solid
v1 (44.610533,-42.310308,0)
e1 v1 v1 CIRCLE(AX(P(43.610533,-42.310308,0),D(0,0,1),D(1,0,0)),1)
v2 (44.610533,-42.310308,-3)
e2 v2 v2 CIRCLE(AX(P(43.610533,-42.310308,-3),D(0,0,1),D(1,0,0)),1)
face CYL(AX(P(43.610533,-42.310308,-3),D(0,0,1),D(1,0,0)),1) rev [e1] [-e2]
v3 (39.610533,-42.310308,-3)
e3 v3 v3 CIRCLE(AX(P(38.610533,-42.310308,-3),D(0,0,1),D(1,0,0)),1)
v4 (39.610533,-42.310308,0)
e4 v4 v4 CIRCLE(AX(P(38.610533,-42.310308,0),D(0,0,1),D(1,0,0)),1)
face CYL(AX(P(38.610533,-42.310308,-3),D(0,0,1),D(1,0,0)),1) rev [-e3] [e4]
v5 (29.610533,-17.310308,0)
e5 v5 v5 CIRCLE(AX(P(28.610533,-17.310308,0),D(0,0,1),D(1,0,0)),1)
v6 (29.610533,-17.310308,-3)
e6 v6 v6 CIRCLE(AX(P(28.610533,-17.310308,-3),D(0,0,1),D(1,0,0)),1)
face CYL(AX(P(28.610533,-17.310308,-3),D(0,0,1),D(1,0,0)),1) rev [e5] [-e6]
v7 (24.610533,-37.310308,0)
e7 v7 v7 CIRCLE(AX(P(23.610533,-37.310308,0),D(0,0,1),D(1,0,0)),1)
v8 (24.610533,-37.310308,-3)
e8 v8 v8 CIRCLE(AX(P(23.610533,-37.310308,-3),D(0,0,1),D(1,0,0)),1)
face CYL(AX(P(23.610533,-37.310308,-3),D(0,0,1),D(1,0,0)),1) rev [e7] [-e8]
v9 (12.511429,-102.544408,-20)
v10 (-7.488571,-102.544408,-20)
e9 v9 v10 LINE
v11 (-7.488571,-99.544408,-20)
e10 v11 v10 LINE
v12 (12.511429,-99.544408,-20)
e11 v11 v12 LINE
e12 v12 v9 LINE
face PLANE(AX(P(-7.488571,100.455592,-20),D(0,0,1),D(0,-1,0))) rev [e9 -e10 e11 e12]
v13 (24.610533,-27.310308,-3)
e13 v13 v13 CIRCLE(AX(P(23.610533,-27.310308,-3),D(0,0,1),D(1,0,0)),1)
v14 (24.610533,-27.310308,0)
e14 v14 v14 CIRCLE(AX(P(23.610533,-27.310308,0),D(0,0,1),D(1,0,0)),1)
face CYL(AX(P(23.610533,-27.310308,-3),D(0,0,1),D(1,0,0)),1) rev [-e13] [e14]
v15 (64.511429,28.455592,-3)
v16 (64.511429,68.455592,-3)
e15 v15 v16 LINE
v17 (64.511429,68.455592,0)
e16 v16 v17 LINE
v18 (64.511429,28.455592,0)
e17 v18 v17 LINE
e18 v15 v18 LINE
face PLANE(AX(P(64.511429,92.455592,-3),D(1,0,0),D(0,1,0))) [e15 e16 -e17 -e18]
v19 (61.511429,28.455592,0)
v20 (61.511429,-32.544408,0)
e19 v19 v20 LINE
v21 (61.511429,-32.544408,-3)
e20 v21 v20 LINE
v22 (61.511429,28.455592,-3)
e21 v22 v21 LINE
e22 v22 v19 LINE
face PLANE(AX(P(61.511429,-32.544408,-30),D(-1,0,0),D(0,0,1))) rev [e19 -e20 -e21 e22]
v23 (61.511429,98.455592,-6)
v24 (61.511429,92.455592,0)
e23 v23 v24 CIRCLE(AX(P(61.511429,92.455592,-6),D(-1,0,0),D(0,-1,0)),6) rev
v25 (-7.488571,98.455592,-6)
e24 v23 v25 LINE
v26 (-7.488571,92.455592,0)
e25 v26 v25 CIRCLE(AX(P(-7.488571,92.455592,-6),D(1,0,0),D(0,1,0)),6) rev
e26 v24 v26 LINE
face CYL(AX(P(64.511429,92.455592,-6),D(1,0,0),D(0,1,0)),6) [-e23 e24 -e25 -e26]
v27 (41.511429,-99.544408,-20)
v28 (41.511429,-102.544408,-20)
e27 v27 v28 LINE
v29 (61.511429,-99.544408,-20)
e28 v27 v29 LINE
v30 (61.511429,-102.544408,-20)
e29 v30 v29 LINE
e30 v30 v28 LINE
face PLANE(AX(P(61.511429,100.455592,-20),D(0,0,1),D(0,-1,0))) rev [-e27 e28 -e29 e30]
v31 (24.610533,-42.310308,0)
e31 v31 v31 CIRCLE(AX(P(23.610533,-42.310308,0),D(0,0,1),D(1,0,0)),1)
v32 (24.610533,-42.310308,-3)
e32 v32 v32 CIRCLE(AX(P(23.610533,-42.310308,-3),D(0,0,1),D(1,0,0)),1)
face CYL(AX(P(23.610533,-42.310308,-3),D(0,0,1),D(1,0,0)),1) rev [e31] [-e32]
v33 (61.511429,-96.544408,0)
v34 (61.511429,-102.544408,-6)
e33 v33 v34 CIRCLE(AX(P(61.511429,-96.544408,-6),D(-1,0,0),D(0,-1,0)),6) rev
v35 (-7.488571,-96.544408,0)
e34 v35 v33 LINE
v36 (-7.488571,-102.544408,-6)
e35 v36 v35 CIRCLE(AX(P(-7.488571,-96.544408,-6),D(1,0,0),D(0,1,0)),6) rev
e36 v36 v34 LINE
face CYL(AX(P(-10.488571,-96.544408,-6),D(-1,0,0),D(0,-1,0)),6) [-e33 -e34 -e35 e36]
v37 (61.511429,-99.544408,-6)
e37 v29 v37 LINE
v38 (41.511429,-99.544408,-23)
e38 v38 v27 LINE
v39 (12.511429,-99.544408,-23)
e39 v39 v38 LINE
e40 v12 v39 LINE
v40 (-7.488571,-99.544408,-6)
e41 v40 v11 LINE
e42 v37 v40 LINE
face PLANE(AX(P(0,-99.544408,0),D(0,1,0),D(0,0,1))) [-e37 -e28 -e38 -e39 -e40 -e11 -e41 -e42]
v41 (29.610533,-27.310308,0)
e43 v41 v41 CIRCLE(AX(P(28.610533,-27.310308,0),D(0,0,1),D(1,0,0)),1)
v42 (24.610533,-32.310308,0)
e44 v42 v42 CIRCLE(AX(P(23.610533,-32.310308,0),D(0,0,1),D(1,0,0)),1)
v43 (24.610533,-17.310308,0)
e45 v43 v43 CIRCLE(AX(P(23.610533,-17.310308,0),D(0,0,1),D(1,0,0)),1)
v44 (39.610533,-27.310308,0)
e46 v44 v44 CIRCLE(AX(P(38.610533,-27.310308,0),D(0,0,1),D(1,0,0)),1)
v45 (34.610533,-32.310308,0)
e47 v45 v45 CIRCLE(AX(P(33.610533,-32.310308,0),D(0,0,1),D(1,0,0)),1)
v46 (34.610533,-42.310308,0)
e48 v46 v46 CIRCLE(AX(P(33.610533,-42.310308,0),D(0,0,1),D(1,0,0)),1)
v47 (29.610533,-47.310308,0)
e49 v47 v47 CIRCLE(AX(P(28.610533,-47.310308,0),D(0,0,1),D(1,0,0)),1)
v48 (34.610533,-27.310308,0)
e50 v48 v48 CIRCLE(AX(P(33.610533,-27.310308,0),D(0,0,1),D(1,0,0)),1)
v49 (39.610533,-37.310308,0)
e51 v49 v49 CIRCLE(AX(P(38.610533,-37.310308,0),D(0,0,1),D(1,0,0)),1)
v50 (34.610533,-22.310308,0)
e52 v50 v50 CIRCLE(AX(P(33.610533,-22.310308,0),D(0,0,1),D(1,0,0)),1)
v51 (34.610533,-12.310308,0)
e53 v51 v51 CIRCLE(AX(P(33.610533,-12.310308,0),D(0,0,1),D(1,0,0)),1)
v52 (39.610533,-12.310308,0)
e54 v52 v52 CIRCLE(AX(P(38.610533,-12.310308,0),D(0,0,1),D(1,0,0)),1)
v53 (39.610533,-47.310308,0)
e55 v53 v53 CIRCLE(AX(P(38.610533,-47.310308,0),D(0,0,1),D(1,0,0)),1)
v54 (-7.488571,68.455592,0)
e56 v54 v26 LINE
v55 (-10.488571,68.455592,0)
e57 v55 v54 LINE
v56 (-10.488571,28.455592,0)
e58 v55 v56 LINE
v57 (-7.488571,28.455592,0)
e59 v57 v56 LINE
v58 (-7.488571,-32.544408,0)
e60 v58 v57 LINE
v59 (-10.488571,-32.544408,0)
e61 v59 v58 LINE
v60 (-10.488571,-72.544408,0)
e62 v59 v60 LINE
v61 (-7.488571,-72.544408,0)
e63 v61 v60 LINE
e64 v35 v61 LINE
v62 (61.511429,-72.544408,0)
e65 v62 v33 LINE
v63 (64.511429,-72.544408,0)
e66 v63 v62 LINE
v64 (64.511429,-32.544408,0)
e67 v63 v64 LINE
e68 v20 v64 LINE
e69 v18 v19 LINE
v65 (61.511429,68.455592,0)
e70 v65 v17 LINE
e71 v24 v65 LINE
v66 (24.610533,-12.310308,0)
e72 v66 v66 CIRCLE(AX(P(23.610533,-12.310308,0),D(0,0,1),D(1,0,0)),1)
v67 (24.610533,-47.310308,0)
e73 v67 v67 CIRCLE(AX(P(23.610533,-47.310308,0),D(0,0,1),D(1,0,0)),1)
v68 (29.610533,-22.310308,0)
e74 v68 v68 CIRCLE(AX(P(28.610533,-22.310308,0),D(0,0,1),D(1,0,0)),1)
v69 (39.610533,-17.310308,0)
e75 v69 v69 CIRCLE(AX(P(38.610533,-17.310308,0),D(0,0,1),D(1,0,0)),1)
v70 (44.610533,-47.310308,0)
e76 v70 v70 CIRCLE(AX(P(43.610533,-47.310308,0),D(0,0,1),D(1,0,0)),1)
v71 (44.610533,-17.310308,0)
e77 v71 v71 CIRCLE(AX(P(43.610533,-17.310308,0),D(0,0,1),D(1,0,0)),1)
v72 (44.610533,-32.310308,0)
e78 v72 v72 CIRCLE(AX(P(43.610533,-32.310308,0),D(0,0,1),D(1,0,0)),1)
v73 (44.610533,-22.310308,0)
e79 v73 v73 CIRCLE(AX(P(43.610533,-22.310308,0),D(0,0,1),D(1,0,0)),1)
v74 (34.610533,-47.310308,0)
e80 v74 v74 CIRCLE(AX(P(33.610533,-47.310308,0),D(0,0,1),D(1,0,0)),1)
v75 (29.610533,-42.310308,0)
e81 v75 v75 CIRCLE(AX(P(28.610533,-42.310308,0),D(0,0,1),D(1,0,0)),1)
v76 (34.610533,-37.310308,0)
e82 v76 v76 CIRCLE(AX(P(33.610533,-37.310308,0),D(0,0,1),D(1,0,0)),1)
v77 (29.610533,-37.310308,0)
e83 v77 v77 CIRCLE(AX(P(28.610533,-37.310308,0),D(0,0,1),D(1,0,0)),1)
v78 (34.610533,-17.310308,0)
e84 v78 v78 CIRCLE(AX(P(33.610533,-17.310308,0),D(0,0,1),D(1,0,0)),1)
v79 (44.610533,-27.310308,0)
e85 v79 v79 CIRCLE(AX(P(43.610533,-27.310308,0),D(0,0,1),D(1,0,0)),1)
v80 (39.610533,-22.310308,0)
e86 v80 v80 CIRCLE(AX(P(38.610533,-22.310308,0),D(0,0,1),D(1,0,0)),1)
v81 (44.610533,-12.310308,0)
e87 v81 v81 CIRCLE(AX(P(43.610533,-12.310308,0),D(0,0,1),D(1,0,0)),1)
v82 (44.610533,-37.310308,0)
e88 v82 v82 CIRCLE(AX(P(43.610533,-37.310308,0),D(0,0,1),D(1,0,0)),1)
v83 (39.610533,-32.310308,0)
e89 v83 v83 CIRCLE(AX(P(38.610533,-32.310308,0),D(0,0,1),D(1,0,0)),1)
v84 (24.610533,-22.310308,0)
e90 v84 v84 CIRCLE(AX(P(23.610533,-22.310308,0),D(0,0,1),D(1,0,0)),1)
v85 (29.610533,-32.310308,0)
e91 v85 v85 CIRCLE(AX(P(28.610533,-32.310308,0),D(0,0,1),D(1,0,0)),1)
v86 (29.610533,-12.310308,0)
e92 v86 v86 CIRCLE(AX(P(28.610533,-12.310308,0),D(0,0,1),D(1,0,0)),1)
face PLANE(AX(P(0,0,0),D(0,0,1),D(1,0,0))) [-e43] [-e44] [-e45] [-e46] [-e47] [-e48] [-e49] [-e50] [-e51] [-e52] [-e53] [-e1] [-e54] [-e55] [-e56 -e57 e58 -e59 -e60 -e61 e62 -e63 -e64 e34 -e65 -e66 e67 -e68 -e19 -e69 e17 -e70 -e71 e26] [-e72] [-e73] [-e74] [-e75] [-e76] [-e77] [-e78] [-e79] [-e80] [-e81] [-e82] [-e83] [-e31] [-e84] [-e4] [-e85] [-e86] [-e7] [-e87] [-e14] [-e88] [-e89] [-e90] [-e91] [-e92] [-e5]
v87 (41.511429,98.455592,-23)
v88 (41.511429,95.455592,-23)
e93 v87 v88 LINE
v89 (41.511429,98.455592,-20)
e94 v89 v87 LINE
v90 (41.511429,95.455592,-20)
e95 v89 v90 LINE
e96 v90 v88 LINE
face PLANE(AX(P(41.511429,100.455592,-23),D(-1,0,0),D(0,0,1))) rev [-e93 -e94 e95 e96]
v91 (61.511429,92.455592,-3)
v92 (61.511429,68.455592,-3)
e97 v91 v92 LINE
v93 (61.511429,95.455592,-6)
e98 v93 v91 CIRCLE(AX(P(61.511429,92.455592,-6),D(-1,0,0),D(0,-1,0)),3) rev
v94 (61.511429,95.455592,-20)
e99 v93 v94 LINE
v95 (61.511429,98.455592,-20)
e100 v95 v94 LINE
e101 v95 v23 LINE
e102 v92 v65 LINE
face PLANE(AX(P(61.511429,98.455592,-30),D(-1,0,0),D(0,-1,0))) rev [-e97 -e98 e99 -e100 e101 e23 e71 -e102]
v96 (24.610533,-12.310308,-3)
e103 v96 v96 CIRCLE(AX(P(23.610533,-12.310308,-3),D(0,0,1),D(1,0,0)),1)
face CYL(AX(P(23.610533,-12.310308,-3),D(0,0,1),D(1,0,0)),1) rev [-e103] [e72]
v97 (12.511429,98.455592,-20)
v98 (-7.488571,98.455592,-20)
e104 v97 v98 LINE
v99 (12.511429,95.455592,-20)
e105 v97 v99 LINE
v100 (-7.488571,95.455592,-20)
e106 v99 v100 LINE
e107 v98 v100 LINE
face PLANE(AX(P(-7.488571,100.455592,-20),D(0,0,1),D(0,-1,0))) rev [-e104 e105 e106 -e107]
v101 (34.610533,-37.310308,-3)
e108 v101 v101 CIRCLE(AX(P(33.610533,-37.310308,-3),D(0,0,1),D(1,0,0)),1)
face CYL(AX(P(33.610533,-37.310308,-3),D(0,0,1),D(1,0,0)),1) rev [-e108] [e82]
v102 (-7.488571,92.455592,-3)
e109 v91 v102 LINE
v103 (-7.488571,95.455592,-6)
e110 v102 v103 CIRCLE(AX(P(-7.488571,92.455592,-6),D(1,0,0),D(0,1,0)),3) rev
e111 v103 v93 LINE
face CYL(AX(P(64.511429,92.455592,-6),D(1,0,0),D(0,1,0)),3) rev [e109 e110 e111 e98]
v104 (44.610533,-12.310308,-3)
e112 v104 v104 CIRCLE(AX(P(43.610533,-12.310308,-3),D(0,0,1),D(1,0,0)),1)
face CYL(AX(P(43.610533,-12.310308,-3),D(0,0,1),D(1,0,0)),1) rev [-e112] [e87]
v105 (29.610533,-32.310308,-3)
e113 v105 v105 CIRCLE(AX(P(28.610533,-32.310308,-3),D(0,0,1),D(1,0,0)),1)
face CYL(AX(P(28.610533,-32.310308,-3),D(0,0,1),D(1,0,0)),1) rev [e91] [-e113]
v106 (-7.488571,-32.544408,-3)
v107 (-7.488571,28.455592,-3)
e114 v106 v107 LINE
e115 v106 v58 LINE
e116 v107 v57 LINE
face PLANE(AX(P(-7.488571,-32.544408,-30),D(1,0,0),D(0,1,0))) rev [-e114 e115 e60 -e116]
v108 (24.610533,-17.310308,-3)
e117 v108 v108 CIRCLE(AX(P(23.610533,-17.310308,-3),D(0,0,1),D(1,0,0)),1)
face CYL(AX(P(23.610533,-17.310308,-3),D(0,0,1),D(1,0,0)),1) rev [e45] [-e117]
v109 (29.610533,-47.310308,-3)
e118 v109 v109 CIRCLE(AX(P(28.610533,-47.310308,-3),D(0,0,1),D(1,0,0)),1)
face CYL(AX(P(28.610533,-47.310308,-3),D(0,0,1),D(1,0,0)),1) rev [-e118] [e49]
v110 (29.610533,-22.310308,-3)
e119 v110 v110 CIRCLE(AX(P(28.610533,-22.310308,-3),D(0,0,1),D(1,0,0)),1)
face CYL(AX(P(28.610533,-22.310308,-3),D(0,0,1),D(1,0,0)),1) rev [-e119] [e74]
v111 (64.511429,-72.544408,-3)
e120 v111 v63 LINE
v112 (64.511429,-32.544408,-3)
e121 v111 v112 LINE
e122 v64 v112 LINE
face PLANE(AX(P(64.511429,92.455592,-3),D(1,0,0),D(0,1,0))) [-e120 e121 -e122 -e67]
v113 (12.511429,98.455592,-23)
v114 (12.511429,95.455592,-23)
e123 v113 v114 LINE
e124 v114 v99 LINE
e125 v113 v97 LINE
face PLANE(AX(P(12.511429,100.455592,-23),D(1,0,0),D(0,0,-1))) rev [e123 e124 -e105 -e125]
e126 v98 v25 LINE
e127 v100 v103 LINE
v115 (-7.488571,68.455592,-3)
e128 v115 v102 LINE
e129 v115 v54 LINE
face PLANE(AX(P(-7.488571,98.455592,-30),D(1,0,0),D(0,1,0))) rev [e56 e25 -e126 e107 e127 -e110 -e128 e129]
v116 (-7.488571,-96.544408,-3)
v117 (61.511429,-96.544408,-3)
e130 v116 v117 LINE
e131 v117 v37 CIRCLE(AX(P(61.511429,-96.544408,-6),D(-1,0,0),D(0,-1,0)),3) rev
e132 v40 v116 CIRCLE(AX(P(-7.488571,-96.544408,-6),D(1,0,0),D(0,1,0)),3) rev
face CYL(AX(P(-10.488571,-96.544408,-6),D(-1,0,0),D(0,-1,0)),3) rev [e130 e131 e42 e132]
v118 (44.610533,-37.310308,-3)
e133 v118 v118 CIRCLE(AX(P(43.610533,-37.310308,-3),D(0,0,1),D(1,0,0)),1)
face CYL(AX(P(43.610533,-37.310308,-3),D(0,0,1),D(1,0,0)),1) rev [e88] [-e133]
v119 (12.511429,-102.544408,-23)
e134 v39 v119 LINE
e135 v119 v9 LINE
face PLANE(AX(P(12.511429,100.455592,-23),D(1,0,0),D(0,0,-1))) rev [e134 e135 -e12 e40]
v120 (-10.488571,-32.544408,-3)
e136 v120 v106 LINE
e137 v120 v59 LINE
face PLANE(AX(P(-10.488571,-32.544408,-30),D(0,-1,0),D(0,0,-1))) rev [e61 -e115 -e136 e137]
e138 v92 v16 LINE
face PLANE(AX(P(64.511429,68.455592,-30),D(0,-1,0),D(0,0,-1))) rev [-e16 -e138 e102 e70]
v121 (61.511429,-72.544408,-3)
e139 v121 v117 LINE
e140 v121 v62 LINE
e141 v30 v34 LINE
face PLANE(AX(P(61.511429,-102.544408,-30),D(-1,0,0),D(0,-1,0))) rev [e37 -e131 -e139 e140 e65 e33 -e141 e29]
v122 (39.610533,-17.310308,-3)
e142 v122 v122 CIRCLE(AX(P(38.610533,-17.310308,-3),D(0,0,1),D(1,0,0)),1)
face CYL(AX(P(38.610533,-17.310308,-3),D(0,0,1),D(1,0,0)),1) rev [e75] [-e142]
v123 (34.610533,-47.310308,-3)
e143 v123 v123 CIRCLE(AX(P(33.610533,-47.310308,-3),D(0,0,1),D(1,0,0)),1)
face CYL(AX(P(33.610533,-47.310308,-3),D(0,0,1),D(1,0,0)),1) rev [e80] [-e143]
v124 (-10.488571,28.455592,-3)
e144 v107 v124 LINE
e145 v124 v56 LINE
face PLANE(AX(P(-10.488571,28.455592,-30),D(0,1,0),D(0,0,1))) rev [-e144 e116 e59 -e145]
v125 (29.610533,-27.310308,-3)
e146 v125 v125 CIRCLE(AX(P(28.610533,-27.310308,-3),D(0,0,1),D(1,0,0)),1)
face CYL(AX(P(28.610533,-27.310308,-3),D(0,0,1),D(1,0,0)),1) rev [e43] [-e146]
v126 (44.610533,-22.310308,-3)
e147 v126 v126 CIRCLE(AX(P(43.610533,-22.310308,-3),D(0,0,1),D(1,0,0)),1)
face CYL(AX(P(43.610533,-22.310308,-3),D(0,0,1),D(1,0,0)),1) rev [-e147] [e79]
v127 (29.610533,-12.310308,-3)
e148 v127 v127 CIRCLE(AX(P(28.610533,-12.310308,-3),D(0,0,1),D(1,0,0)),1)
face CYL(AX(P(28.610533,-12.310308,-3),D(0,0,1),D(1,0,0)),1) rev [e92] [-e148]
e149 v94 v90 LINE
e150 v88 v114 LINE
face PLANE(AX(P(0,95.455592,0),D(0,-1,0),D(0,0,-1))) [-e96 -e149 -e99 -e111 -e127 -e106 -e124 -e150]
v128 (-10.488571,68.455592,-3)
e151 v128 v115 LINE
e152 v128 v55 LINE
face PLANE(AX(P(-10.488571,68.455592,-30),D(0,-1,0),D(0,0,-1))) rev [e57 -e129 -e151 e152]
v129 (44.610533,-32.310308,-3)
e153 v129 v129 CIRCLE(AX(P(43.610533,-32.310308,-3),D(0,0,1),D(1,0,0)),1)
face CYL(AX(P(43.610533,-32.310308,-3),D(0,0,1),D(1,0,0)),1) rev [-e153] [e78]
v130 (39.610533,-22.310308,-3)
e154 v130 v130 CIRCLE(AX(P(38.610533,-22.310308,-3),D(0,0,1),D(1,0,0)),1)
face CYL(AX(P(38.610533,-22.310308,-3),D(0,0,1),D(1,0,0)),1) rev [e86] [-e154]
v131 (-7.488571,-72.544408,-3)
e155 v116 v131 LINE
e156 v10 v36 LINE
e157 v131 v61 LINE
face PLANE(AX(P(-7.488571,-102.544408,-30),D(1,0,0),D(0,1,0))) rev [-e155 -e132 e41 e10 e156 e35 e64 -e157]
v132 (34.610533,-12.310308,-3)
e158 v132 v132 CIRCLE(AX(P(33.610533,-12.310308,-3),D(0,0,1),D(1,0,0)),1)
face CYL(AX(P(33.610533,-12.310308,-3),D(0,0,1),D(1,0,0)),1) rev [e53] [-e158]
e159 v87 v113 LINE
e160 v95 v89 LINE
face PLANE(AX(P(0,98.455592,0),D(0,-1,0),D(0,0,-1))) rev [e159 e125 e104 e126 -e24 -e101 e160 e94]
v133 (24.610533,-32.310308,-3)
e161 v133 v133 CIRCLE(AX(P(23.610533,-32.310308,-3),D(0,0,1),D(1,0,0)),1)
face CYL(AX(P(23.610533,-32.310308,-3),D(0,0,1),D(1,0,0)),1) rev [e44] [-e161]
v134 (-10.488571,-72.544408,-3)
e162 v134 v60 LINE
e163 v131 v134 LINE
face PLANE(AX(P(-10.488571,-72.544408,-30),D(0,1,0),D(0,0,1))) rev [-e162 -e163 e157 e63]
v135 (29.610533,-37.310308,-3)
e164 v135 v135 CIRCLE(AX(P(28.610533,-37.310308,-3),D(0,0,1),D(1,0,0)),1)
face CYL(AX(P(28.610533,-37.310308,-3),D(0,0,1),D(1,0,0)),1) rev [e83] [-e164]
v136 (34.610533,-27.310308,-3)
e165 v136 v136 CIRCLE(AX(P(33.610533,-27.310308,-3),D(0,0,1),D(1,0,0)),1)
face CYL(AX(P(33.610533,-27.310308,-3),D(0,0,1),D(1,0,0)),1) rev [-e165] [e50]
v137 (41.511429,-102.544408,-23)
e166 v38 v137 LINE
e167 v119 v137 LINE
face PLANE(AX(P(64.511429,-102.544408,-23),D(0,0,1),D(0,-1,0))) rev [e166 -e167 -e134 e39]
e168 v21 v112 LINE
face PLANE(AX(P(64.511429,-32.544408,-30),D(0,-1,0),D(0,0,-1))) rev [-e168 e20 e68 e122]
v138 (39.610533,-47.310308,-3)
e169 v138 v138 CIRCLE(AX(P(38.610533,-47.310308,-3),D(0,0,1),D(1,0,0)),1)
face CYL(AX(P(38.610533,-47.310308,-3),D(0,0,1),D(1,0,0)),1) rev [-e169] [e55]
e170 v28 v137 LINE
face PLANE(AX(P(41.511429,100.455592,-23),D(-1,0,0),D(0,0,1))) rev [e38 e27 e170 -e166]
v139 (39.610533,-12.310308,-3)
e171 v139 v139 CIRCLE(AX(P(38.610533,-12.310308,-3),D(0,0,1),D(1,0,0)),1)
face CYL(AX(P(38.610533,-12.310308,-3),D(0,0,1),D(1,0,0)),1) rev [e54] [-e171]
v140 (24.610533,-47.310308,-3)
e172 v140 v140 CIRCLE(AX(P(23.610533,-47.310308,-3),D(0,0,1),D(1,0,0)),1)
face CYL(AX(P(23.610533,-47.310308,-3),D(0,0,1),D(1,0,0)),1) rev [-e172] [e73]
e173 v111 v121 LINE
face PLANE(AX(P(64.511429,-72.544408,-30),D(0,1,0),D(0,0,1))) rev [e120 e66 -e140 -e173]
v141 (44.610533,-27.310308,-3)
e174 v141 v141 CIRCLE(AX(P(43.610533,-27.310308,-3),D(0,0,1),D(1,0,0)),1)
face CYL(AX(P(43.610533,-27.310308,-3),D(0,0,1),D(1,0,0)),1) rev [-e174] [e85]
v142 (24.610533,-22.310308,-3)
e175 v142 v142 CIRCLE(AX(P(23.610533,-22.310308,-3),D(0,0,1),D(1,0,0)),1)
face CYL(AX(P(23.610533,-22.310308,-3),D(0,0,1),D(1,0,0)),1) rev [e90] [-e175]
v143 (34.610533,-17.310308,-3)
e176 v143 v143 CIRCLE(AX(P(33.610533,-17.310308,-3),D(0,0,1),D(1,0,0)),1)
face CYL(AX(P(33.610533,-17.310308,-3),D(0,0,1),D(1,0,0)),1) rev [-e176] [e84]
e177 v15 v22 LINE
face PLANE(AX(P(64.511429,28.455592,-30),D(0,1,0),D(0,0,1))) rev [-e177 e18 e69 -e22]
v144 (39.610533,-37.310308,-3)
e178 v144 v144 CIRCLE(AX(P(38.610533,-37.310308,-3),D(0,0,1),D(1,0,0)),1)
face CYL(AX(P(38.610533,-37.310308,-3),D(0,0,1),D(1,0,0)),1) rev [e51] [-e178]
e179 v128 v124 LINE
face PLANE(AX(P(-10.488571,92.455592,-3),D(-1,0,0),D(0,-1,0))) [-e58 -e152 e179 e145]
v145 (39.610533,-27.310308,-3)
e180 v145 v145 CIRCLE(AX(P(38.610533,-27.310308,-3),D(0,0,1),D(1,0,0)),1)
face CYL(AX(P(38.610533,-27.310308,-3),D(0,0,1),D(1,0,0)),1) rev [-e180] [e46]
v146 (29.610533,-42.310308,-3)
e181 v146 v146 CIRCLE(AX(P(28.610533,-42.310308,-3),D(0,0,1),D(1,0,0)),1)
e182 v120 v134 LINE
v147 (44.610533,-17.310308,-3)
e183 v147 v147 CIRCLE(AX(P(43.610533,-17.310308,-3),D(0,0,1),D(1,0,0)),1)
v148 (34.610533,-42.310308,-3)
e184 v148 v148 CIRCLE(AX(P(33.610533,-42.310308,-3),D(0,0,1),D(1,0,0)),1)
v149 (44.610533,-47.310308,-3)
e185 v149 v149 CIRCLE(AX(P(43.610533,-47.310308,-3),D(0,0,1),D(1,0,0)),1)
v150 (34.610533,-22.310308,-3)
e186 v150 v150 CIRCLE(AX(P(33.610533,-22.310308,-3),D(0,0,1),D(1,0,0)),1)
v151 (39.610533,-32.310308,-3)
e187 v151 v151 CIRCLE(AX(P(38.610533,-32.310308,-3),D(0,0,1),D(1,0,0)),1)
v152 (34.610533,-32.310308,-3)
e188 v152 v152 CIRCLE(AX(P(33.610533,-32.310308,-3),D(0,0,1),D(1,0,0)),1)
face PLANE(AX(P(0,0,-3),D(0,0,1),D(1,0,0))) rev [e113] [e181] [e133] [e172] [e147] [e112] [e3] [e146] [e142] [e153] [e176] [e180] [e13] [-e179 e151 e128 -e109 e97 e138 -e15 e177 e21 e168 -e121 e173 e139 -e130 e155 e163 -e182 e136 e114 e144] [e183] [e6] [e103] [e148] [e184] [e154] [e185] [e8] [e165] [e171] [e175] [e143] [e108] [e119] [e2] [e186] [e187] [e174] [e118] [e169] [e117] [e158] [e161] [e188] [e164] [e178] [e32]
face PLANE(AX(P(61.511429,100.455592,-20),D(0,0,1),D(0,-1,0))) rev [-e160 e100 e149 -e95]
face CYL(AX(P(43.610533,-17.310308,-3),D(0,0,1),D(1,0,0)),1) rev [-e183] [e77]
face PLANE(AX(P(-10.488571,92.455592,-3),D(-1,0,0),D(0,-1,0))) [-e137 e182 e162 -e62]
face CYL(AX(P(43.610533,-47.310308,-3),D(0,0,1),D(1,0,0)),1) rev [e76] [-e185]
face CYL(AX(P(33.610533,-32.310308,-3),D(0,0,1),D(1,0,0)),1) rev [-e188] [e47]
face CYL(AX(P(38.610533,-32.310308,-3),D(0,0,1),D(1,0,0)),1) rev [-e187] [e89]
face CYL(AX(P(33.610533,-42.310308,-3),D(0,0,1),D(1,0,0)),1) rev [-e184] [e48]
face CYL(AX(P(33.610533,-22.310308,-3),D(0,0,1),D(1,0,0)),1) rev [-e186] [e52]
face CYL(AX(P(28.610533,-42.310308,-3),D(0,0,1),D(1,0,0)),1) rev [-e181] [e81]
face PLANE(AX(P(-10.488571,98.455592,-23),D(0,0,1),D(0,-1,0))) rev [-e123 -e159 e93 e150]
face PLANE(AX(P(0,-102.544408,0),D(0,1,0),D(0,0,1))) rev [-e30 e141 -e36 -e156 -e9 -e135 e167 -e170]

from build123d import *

# Parameters (mm, degrees)
SKETCH_1_W                       = 75
SKETCH_1_H                       = 192
SM_BASE_FLANGE_2_DEPTH           = 3
SM_EDGE_FLANGE_1_STRIP_W         = 18
SM_EDGE_FLANGE_1_STRIP_H         = 3
SM_EDGE_FLANGE_1_STRIP_CUT_DEPTH = 75
SM_EDGE_FLANGE_1_DEPTH           = 75
SM_EDGE_FLANGE_2_DEPTH           = 75
SKETCH_18_W                      = 3
SKETCH_18_H                      = 30
SKETCH_18_H_2                    = 61
CUT_EXTRUDE_1_DEPTH              = 30
SKETCH_19_W                      = 20
SKETCH_19_H                      = 3
CUT_EXTRUDE_2_DEPTH              = 203
SKETCH_20_R                      = 1
CUT_EXTRUDE_3_DEPTH              = 3


# Sheet-metal steps are written as plain solids
with BuildPart() as part:
    # 草图1 → 基体-法兰2 (new body)
    with BuildSketch(Plane.XY):
        with Locations((27.011429417, -3.544407938)):
            Rectangle(SKETCH_1_W, SKETCH_1_H)
    extrude(amount=-SM_BASE_FLANGE_2_DEPTH)

    # 边线-法兰1 strip (across the edge) → 边线-法兰1 strip cut (cut)
    with BuildSketch(Plane(origin=(64.511429417, -99.544407938, -3), x_dir=(0, 1, 0), z_dir=(-1, 0, 0))):
        with Locations((-6, -1.5)):
            Rectangle(SM_EDGE_FLANGE_1_STRIP_W, SM_EDGE_FLANGE_1_STRIP_H)
    extrude(amount=SM_EDGE_FLANGE_1_STRIP_CUT_DEPTH, mode=Mode.SUBTRACT)

    # 边线-法兰1 section (across the edge) → 边线-法兰1 (add)
    with BuildSketch(Plane(origin=(64.511429417, -99.544407938, -3), x_dir=(0, 1, 0), z_dir=(-1, 0, 0))):
        with BuildLine():
            Line((-3, 3), (-3, 20))
            Line((-3, 20), (0, 20))
            Line((0, 20), (0, 3))
            ThreePointArc((0, 3), (0.878679656, 0.878679656), (3, 0))
            Line((3, 0), (3, -3))
            ThreePointArc((3, -3), (-1.242640687, -1.242640687), (-3, 3))
        make_face()
    extrude(amount=SM_EDGE_FLANGE_1_DEPTH)

    # 边线-法兰2 section (across the edge) → 边线-法兰2 (add)
    with BuildSketch(Plane(origin=(-10.488570583, 95.455592062, -3), x_dir=(0, -1, 0), z_dir=(1, 0, 0))):
        with BuildLine():
            Line((-3, 3), (-3, 20))
            Line((-3, 20), (0, 20))
            Line((0, 20), (0, 3))
            ThreePointArc((0, 3), (0.878679656, 0.878679656), (3, 0))
            Line((3, 0), (3, -3))
            ThreePointArc((3, -3), (-1.242640687, -1.242640687), (-3, 3))
        make_face()
    extrude(amount=SM_EDGE_FLANGE_2_DEPTH)

    # 草图18 → 切除-拉伸1 (cut)
    with BuildSketch(Plane.XY):
        with Locations((63.011429417, -87.544407938)):
            Rectangle(SKETCH_18_W, SKETCH_18_H)
        with Locations((63.011429417, 83.455592062)):
            Rectangle(SKETCH_18_W, SKETCH_18_H)
        with Locations((63.011429417, -2.044407938)):
            Rectangle(SKETCH_18_W, SKETCH_18_H_2)
        with Locations((-8.988570583, -2.044407938)):
            Rectangle(SKETCH_18_W, SKETCH_18_H_2)
        with Locations((-8.988570583, -87.544407938)):
            Rectangle(SKETCH_18_W, SKETCH_18_H)
        with Locations((-8.988570583, 83.455592062)):
            Rectangle(SKETCH_18_W, SKETCH_18_H)
    extrude(amount=-CUT_EXTRUDE_1_DEPTH, mode=Mode.SUBTRACT)

    # 草图19 → 切除-拉伸2 (cut)
    with BuildSketch(Plane.XZ.offset(102.544407938)):
        with Locations((2.511429417, -21.5)):
            Rectangle(SKETCH_19_W, SKETCH_19_H)
        with Locations((51.511429417, -21.5)):
            Rectangle(SKETCH_19_W, SKETCH_19_H)
    extrude(amount=-CUT_EXTRUDE_2_DEPTH, mode=Mode.SUBTRACT)

    # 草图20 → 切除-拉伸3 (cut)
    with BuildSketch(Plane.XY):
        with Locations((23.610533211, -47.310308186)):
            Circle(SKETCH_20_R)
        with Locations((28.610533211, -47.310308186)):
            Circle(SKETCH_20_R)
        with Locations((33.610533211, -47.310308186)):
            Circle(SKETCH_20_R)
        with Locations((38.610533211, -47.310308186)):
            Circle(SKETCH_20_R)
        with Locations((43.610533211, -47.310308186)):
            Circle(SKETCH_20_R)
        with Locations((28.610533211, -42.310308186)):
            Circle(SKETCH_20_R)
        with Locations((33.610533211, -42.310308186)):
            Circle(SKETCH_20_R)
        with Locations((38.610533211, -42.310308186)):
            Circle(SKETCH_20_R)
        with Locations((43.610533211, -42.310308186)):
            Circle(SKETCH_20_R)
        with Locations((28.610533211, -37.310308186)):
            Circle(SKETCH_20_R)
        with Locations((33.610533211, -37.310308186)):
            Circle(SKETCH_20_R)
        with Locations((38.610533211, -37.310308186)):
            Circle(SKETCH_20_R)
        with Locations((43.610533211, -37.310308186)):
            Circle(SKETCH_20_R)
        with Locations((28.610533211, -32.310308186)):
            Circle(SKETCH_20_R)
        with Locations((33.610533211, -32.310308186)):
            Circle(SKETCH_20_R)
        with Locations((38.610533211, -32.310308186)):
            Circle(SKETCH_20_R)
        with Locations((43.610533211, -32.310308186)):
            Circle(SKETCH_20_R)
        with Locations((28.610533211, -27.310308186)):
            Circle(SKETCH_20_R)
        with Locations((33.610533211, -27.310308186)):
            Circle(SKETCH_20_R)
        with Locations((38.610533211, -27.310308186)):
            Circle(SKETCH_20_R)
        with Locations((43.610533211, -27.310308186)):
            Circle(SKETCH_20_R)
        with Locations((28.610533211, -22.310308186)):
            Circle(SKETCH_20_R)
        with Locations((33.610533211, -22.310308186)):
            Circle(SKETCH_20_R)
        with Locations((38.610533211, -22.310308186)):
            Circle(SKETCH_20_R)
        with Locations((43.610533211, -22.310308186)):
            Circle(SKETCH_20_R)
        with Locations((28.610533211, -17.310308186)):
            Circle(SKETCH_20_R)
        with Locations((33.610533211, -17.310308186)):
            Circle(SKETCH_20_R)
        with Locations((38.610533211, -17.310308186)):
            Circle(SKETCH_20_R)
        with Locations((43.610533211, -17.310308186)):
            Circle(SKETCH_20_R)
        with Locations((28.610533211, -12.310308186)):
            Circle(SKETCH_20_R)
        with Locations((33.610533211, -12.310308186)):
            Circle(SKETCH_20_R)
        with Locations((38.610533211, -12.310308186)):
            Circle(SKETCH_20_R)
        with Locations((43.610533211, -12.310308186)):
            Circle(SKETCH_20_R)
        with Locations((23.610533211, -42.310308186)):
            Circle(SKETCH_20_R)
        with Locations((23.610533211, -37.310308186)):
            Circle(SKETCH_20_R)
        with Locations((23.610533211, -32.310308186)):
            Circle(SKETCH_20_R)
        with Locations((23.610533211, -27.310308186)):
            Circle(SKETCH_20_R)
        with Locations((23.610533211, -22.310308186)):
            Circle(SKETCH_20_R)
        with Locations((23.610533211, -17.310308186)):
            Circle(SKETCH_20_R)
        with Locations((23.610533211, -12.310308186)):
            Circle(SKETCH_20_R)
    extrude(amount=-CUT_EXTRUDE_3_DEPTH, mode=Mode.SUBTRACT)


solid = part.part
